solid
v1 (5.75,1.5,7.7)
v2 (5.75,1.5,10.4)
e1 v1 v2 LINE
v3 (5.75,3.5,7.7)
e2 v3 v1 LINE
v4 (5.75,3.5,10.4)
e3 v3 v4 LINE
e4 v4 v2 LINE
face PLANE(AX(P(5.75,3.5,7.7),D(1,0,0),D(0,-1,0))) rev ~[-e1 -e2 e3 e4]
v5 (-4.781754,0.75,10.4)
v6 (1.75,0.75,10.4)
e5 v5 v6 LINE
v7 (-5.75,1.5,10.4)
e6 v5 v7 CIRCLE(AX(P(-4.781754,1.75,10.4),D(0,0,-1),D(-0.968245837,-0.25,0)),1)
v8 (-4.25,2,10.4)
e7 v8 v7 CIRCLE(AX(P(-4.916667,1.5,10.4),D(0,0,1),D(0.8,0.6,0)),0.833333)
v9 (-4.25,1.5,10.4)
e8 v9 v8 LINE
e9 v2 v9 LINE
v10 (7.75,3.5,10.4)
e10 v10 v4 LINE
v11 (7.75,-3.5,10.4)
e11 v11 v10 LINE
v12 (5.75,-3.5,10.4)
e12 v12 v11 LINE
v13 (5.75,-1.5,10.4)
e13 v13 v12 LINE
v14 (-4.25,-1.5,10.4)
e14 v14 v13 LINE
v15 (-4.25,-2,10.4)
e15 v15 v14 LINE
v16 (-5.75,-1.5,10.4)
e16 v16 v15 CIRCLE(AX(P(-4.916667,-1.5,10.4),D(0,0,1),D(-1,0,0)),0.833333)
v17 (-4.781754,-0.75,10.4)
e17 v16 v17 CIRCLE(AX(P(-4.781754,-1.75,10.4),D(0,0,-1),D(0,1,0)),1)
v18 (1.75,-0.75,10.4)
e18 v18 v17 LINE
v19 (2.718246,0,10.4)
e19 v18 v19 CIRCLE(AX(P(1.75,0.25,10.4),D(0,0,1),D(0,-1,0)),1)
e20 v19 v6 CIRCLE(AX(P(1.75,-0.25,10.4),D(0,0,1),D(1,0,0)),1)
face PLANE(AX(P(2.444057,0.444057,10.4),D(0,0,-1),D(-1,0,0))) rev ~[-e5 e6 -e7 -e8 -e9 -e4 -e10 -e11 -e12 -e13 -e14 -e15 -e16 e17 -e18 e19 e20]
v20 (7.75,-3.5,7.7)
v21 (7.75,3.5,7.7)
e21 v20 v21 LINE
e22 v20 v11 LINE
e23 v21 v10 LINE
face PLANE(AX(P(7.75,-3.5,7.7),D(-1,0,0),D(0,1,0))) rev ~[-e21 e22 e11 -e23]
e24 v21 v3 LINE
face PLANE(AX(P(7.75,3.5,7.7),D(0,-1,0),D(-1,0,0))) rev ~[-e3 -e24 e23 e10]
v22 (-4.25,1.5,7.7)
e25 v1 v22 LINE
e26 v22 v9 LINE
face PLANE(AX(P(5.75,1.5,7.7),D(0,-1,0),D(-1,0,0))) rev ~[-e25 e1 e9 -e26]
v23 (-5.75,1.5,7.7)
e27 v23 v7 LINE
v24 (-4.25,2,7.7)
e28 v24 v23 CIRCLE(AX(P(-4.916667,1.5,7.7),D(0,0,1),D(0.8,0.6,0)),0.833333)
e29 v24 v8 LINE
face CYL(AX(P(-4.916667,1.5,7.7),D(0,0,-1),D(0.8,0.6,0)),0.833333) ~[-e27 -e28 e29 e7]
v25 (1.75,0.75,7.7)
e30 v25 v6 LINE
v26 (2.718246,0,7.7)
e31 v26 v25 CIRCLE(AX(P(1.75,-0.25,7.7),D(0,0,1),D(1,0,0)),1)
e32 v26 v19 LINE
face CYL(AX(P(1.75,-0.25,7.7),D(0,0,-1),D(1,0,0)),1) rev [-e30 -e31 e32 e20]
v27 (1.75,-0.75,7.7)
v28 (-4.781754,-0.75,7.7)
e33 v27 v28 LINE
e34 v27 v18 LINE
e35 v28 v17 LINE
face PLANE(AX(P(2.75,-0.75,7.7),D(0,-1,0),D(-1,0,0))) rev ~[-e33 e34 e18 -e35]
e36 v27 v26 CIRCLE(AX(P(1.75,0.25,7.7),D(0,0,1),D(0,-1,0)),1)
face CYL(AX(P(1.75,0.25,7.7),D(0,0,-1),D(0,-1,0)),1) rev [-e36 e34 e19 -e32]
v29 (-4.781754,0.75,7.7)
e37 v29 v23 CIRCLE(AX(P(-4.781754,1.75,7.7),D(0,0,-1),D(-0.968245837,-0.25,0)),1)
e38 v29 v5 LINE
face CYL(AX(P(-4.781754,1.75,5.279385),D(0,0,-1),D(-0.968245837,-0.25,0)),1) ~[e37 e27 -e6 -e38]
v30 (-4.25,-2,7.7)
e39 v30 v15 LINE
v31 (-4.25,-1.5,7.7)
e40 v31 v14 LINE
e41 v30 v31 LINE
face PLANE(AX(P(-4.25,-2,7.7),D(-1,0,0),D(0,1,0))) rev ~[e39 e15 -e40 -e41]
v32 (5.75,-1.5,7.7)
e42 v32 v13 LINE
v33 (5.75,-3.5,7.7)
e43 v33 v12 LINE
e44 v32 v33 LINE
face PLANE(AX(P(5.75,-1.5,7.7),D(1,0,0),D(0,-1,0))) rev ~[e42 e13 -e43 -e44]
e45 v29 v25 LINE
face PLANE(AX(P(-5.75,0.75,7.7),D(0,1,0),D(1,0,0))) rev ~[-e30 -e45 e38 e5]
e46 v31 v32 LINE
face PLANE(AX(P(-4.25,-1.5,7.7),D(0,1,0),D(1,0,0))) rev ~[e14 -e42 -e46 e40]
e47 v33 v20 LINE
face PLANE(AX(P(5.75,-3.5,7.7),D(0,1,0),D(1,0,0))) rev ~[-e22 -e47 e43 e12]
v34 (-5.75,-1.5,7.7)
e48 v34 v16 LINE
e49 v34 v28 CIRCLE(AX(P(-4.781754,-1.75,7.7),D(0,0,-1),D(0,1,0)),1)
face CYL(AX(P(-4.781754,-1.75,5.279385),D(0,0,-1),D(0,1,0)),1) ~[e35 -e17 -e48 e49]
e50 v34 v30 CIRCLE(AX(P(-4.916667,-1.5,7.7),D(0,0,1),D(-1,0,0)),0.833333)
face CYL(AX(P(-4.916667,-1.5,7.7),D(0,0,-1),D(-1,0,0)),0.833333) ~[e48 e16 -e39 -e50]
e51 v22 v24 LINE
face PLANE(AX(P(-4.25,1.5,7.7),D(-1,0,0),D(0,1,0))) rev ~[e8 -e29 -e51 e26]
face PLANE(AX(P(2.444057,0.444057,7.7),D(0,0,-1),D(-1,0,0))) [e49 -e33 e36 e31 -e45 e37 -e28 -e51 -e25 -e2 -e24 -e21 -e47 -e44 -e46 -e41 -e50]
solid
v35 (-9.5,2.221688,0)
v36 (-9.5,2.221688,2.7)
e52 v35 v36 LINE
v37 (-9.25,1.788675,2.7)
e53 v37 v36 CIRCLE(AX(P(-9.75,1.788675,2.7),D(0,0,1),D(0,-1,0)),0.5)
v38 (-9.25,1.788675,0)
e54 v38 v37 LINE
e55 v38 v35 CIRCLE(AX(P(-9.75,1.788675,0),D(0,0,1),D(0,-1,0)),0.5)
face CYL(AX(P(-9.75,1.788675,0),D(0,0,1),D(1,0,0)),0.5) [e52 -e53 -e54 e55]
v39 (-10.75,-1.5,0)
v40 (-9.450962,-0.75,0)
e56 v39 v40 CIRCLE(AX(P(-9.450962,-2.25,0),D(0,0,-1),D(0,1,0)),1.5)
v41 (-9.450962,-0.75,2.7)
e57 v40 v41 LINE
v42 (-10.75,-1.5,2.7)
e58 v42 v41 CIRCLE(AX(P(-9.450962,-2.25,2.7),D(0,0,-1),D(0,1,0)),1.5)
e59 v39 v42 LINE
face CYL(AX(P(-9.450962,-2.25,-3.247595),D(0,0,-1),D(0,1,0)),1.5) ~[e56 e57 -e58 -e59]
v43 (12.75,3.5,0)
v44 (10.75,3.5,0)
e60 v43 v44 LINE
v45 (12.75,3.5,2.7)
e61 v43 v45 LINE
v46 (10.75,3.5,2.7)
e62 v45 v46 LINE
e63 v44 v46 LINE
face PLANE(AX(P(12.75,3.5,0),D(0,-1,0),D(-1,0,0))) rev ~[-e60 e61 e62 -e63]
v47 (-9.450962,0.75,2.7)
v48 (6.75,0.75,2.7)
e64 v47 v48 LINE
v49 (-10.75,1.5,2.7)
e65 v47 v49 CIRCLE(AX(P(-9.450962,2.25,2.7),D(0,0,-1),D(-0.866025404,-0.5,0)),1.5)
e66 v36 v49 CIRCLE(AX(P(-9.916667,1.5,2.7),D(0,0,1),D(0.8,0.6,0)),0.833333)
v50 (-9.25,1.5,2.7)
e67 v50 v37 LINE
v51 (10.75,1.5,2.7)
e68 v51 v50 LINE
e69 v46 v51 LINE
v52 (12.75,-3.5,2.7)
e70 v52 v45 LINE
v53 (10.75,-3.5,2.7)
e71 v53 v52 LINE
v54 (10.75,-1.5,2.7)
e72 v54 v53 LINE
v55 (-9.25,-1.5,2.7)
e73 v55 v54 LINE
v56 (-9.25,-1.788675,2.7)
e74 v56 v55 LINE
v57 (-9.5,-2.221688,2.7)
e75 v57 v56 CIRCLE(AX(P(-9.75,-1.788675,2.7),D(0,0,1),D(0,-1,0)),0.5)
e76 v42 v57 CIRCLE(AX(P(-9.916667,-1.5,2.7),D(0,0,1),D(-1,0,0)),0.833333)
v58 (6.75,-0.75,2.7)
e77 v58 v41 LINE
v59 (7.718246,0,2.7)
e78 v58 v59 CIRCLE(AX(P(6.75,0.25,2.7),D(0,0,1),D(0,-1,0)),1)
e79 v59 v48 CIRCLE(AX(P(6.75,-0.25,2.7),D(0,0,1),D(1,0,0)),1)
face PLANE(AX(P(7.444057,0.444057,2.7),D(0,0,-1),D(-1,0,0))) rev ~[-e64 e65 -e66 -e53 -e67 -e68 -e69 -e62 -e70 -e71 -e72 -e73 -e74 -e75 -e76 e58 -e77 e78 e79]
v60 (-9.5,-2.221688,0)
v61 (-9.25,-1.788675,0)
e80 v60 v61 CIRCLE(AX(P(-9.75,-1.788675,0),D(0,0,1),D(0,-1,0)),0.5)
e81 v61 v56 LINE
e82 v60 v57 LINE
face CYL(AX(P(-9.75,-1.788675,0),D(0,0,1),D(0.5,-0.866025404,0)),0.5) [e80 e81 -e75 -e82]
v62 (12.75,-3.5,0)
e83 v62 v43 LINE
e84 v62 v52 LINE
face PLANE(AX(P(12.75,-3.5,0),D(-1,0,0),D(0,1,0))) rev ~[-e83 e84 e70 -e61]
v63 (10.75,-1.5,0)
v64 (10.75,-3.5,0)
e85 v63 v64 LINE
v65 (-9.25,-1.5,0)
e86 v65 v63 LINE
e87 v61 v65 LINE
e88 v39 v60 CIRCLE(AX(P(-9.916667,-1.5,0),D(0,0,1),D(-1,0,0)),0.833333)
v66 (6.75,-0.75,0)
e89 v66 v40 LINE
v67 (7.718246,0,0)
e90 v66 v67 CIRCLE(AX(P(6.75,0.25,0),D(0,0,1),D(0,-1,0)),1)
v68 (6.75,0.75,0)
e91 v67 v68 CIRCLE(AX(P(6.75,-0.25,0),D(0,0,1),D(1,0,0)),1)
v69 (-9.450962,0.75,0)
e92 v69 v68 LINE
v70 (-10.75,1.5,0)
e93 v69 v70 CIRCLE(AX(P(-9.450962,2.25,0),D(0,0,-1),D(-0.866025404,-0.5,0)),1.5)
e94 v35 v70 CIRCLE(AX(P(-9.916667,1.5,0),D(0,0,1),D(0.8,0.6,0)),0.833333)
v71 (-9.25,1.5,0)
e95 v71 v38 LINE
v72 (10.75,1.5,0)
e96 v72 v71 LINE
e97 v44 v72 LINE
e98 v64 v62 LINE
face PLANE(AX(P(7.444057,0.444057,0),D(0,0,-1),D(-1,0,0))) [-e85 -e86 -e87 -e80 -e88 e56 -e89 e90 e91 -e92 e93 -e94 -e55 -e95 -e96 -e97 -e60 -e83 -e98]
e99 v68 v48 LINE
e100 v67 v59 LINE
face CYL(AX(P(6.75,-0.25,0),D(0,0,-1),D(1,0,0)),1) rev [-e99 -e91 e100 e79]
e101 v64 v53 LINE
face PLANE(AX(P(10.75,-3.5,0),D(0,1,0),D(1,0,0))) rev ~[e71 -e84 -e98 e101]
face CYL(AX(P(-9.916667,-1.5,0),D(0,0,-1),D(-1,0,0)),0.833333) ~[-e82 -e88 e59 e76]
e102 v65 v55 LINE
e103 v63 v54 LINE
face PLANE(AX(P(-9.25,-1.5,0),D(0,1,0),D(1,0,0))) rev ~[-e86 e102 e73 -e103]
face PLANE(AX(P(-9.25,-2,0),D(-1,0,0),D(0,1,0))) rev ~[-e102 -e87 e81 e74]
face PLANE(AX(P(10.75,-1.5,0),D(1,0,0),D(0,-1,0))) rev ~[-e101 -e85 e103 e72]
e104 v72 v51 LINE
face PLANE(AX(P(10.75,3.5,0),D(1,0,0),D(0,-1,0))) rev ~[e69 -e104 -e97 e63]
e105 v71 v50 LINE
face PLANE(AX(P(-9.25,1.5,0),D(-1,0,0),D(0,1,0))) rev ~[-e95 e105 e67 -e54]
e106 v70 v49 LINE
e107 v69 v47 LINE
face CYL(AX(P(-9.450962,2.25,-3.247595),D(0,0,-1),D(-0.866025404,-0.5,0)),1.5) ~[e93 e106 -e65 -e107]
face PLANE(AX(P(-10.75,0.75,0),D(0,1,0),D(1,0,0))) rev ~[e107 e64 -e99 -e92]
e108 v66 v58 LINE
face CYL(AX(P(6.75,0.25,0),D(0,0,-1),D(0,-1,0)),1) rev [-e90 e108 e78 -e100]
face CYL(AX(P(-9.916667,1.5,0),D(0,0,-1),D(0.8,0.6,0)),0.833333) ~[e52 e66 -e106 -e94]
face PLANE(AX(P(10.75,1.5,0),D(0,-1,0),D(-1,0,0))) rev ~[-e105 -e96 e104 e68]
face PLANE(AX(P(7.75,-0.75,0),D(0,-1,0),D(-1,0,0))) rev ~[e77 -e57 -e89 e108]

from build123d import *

# Parameters (mm, degrees)
F1_DEPTH    = 2.7
F2_R        = 0.5
F3_T1_DEPTH = 9.1951905284
F4_T1_DEPTH = 2.7
F7_DEPTH    = 2.7
F8_T1_DEPTH = 7.5412291828
F9_T1_DEPTH = 2.7


# Not quite as in the source:
# - a fillet or chamfer that OpenCascade refuses, or shapes differently, is made with other operations: its cross-section is extruded or revolved along the edge and cut away or added


with BuildPart() as f1:
    # F0 (on Top) → F1 (new body)
    with BuildSketch(Plane.XY):
        Polygon((10.75, -1.5), (10.75, 1.5), (-9.25, 1.5), (-10.75, 1.5), (-10.75, 0.75), (7.75, 0.75), (7.75, -0.75), (-10.75, -0.75), (-10.75, -1.5), (-9.25, -1.5), align=None)
        Polygon((10.75, 3.5), (10.75, 1.5), (10.75, -1.5), (10.75, -3.5), (12.75, -3.5), (12.75, 3.5), align=None)
        with BuildLine():
            Line((-10.75, 1.5), (-9.25, 1.5))
            Line((-9.25, 1.5), (-9.25, 2))
            ThreePointArc((-9.25, 2), (-10.180189805, 2.290569415), (-10.75, 1.5))
        make_face()
        with BuildLine():
            Line((-9.25, -2), (-9.25, -1.5))
            Line((-9.25, -1.5), (-10.75, -1.5))
            ThreePointArc((-10.75, -1.5), (-10.180189805, -2.290569415), (-9.25, -2))
        make_face()
    extrude(amount=F1_DEPTH)

    # F2
    f2_edges = [f1.edges().sort_by_distance(p)[0] for p in [
        (-9.25, 2, 1.35),
        (-9.25, -2, 1.35),
    ]]
    fillet(f2_edges, radius=F2_R)

    # F3: fillet of radius 1.5 on 2 edges, made by hand

    # F3_s2 → F3_t1 (cut)
    with BuildSketch(Plane.XY.offset(-3.2475952642)):
        with BuildLine():
            ThreePointArc((-10.75, 1.5), (-10.2009618943, 0.9509618943), (-9.4509618943, 0.75))
            Line((-9.4509618943, 0.75), (-10.75, 0.75))
            Line((-10.75, 0.75), (-10.75, 1.5))
        make_face()
        with BuildLine():
            ThreePointArc((-9.4509618943, -0.75), (-10.2009618943, -0.9509618943), (-10.75, -1.5))
            Line((-10.75, -1.5), (-10.75, -0.75))
            Line((-10.75, -0.75), (-9.4509618943, -0.75))
        make_face()
    extrude(amount=F3_T1_DEPTH, mode=Mode.SUBTRACT)

    # F4: fillet of radius 1 on 2 edges, made by hand

    # F4_s2 → F4_t1 (join)
    with BuildSketch(Plane.XY):
        with BuildLine():
            ThreePointArc((7.75, -0.25), (7.4571067812, 0.4571067812), (6.75, 0.75))
            Line((6.75, 0.75), (7.75, 0.75))
            Line((7.75, 0.75), (7.75, -0.25))
        make_face()
        with BuildLine():
            ThreePointArc((6.75, -0.75), (7.4571067812, -0.4571067812), (7.75, 0.25))
            Line((7.75, 0.25), (7.75, -0.75))
            Line((7.75, -0.75), (6.75, -0.75))
        make_face()
    extrude(amount=F4_T1_DEPTH)


with BuildPart() as f7:
    # F6 (on offset) → F7 (new body)
    with BuildSketch(Plane.XY.offset(7.7)):
        Polygon((5.75, 3.5), (5.75, 1.5), (5.75, -1.5), (5.75, -3.5), (7.75, -3.5), (7.75, 3.5), align=None)
        Polygon((5.75, -1.5), (5.75, 1.5), (-4.25, 1.5), (-5.75, 1.5), (-5.75, 0.75), (2.75, 0.75), (2.75, -0.75), (-5.75, -0.75), (-5.75, -1.5), (-4.25, -1.5), align=None)
        with BuildLine():
            Line((-5.75, 1.5), (-4.25, 1.5))
            Line((-4.25, 1.5), (-4.25, 2))
            ThreePointArc((-4.25, 2), (-5.180189805, 2.290569415), (-5.75, 1.5))
        make_face()
        with BuildLine():
            Line((-4.25, -2), (-4.25, -1.5))
            Line((-4.25, -1.5), (-5.75, -1.5))
            ThreePointArc((-5.75, -1.5), (-5.180189805, -2.290569415), (-4.25, -2))
        make_face()
    extrude(amount=F7_DEPTH)

    # F8: fillet of radius 1 on 2 edges, made by hand

    # F8_s2 → F8_t1 (cut)
    with BuildSketch(Plane.XY.offset(5.2793854086)):
        with BuildLine():
            ThreePointArc((-5.75, 1.5), (-5.3941265991, 0.959430585), (-4.7817541634, 0.75))
            Line((-4.7817541634, 0.75), (-5.75, 0.75))
            Line((-5.75, 0.75), (-5.75, 1.5))
        make_face()
        with BuildLine():
            ThreePointArc((-4.7817541634, -0.75), (-5.3941265991, -0.959430585), (-5.75, -1.5))
            Line((-5.75, -1.5), (-5.75, -0.75))
            Line((-5.75, -0.75), (-4.7817541634, -0.75))
        make_face()
    extrude(amount=F8_T1_DEPTH, mode=Mode.SUBTRACT)

    # F9: fillet of radius 1 on 2 edges, made by hand

    # F9_s2 → F9_t1 (join)
    with BuildSketch(Plane.XY.offset(7.7)):
        with BuildLine():
            ThreePointArc((2.75, -0.25), (2.4571067812, 0.4571067812), (1.75, 0.75))
            Line((1.75, 0.75), (2.75, 0.75))
            Line((2.75, 0.75), (2.75, -0.25))
        make_face()
        with BuildLine():
            ThreePointArc((1.75, -0.75), (2.4571067812, -0.4571067812), (2.75, 0.25))
            Line((2.75, 0.25), (2.75, -0.75))
            Line((2.75, -0.75), (1.75, -0.75))
        make_face()
    extrude(amount=F9_T1_DEPTH)


solid = Compound([f1.part, f7.part])
